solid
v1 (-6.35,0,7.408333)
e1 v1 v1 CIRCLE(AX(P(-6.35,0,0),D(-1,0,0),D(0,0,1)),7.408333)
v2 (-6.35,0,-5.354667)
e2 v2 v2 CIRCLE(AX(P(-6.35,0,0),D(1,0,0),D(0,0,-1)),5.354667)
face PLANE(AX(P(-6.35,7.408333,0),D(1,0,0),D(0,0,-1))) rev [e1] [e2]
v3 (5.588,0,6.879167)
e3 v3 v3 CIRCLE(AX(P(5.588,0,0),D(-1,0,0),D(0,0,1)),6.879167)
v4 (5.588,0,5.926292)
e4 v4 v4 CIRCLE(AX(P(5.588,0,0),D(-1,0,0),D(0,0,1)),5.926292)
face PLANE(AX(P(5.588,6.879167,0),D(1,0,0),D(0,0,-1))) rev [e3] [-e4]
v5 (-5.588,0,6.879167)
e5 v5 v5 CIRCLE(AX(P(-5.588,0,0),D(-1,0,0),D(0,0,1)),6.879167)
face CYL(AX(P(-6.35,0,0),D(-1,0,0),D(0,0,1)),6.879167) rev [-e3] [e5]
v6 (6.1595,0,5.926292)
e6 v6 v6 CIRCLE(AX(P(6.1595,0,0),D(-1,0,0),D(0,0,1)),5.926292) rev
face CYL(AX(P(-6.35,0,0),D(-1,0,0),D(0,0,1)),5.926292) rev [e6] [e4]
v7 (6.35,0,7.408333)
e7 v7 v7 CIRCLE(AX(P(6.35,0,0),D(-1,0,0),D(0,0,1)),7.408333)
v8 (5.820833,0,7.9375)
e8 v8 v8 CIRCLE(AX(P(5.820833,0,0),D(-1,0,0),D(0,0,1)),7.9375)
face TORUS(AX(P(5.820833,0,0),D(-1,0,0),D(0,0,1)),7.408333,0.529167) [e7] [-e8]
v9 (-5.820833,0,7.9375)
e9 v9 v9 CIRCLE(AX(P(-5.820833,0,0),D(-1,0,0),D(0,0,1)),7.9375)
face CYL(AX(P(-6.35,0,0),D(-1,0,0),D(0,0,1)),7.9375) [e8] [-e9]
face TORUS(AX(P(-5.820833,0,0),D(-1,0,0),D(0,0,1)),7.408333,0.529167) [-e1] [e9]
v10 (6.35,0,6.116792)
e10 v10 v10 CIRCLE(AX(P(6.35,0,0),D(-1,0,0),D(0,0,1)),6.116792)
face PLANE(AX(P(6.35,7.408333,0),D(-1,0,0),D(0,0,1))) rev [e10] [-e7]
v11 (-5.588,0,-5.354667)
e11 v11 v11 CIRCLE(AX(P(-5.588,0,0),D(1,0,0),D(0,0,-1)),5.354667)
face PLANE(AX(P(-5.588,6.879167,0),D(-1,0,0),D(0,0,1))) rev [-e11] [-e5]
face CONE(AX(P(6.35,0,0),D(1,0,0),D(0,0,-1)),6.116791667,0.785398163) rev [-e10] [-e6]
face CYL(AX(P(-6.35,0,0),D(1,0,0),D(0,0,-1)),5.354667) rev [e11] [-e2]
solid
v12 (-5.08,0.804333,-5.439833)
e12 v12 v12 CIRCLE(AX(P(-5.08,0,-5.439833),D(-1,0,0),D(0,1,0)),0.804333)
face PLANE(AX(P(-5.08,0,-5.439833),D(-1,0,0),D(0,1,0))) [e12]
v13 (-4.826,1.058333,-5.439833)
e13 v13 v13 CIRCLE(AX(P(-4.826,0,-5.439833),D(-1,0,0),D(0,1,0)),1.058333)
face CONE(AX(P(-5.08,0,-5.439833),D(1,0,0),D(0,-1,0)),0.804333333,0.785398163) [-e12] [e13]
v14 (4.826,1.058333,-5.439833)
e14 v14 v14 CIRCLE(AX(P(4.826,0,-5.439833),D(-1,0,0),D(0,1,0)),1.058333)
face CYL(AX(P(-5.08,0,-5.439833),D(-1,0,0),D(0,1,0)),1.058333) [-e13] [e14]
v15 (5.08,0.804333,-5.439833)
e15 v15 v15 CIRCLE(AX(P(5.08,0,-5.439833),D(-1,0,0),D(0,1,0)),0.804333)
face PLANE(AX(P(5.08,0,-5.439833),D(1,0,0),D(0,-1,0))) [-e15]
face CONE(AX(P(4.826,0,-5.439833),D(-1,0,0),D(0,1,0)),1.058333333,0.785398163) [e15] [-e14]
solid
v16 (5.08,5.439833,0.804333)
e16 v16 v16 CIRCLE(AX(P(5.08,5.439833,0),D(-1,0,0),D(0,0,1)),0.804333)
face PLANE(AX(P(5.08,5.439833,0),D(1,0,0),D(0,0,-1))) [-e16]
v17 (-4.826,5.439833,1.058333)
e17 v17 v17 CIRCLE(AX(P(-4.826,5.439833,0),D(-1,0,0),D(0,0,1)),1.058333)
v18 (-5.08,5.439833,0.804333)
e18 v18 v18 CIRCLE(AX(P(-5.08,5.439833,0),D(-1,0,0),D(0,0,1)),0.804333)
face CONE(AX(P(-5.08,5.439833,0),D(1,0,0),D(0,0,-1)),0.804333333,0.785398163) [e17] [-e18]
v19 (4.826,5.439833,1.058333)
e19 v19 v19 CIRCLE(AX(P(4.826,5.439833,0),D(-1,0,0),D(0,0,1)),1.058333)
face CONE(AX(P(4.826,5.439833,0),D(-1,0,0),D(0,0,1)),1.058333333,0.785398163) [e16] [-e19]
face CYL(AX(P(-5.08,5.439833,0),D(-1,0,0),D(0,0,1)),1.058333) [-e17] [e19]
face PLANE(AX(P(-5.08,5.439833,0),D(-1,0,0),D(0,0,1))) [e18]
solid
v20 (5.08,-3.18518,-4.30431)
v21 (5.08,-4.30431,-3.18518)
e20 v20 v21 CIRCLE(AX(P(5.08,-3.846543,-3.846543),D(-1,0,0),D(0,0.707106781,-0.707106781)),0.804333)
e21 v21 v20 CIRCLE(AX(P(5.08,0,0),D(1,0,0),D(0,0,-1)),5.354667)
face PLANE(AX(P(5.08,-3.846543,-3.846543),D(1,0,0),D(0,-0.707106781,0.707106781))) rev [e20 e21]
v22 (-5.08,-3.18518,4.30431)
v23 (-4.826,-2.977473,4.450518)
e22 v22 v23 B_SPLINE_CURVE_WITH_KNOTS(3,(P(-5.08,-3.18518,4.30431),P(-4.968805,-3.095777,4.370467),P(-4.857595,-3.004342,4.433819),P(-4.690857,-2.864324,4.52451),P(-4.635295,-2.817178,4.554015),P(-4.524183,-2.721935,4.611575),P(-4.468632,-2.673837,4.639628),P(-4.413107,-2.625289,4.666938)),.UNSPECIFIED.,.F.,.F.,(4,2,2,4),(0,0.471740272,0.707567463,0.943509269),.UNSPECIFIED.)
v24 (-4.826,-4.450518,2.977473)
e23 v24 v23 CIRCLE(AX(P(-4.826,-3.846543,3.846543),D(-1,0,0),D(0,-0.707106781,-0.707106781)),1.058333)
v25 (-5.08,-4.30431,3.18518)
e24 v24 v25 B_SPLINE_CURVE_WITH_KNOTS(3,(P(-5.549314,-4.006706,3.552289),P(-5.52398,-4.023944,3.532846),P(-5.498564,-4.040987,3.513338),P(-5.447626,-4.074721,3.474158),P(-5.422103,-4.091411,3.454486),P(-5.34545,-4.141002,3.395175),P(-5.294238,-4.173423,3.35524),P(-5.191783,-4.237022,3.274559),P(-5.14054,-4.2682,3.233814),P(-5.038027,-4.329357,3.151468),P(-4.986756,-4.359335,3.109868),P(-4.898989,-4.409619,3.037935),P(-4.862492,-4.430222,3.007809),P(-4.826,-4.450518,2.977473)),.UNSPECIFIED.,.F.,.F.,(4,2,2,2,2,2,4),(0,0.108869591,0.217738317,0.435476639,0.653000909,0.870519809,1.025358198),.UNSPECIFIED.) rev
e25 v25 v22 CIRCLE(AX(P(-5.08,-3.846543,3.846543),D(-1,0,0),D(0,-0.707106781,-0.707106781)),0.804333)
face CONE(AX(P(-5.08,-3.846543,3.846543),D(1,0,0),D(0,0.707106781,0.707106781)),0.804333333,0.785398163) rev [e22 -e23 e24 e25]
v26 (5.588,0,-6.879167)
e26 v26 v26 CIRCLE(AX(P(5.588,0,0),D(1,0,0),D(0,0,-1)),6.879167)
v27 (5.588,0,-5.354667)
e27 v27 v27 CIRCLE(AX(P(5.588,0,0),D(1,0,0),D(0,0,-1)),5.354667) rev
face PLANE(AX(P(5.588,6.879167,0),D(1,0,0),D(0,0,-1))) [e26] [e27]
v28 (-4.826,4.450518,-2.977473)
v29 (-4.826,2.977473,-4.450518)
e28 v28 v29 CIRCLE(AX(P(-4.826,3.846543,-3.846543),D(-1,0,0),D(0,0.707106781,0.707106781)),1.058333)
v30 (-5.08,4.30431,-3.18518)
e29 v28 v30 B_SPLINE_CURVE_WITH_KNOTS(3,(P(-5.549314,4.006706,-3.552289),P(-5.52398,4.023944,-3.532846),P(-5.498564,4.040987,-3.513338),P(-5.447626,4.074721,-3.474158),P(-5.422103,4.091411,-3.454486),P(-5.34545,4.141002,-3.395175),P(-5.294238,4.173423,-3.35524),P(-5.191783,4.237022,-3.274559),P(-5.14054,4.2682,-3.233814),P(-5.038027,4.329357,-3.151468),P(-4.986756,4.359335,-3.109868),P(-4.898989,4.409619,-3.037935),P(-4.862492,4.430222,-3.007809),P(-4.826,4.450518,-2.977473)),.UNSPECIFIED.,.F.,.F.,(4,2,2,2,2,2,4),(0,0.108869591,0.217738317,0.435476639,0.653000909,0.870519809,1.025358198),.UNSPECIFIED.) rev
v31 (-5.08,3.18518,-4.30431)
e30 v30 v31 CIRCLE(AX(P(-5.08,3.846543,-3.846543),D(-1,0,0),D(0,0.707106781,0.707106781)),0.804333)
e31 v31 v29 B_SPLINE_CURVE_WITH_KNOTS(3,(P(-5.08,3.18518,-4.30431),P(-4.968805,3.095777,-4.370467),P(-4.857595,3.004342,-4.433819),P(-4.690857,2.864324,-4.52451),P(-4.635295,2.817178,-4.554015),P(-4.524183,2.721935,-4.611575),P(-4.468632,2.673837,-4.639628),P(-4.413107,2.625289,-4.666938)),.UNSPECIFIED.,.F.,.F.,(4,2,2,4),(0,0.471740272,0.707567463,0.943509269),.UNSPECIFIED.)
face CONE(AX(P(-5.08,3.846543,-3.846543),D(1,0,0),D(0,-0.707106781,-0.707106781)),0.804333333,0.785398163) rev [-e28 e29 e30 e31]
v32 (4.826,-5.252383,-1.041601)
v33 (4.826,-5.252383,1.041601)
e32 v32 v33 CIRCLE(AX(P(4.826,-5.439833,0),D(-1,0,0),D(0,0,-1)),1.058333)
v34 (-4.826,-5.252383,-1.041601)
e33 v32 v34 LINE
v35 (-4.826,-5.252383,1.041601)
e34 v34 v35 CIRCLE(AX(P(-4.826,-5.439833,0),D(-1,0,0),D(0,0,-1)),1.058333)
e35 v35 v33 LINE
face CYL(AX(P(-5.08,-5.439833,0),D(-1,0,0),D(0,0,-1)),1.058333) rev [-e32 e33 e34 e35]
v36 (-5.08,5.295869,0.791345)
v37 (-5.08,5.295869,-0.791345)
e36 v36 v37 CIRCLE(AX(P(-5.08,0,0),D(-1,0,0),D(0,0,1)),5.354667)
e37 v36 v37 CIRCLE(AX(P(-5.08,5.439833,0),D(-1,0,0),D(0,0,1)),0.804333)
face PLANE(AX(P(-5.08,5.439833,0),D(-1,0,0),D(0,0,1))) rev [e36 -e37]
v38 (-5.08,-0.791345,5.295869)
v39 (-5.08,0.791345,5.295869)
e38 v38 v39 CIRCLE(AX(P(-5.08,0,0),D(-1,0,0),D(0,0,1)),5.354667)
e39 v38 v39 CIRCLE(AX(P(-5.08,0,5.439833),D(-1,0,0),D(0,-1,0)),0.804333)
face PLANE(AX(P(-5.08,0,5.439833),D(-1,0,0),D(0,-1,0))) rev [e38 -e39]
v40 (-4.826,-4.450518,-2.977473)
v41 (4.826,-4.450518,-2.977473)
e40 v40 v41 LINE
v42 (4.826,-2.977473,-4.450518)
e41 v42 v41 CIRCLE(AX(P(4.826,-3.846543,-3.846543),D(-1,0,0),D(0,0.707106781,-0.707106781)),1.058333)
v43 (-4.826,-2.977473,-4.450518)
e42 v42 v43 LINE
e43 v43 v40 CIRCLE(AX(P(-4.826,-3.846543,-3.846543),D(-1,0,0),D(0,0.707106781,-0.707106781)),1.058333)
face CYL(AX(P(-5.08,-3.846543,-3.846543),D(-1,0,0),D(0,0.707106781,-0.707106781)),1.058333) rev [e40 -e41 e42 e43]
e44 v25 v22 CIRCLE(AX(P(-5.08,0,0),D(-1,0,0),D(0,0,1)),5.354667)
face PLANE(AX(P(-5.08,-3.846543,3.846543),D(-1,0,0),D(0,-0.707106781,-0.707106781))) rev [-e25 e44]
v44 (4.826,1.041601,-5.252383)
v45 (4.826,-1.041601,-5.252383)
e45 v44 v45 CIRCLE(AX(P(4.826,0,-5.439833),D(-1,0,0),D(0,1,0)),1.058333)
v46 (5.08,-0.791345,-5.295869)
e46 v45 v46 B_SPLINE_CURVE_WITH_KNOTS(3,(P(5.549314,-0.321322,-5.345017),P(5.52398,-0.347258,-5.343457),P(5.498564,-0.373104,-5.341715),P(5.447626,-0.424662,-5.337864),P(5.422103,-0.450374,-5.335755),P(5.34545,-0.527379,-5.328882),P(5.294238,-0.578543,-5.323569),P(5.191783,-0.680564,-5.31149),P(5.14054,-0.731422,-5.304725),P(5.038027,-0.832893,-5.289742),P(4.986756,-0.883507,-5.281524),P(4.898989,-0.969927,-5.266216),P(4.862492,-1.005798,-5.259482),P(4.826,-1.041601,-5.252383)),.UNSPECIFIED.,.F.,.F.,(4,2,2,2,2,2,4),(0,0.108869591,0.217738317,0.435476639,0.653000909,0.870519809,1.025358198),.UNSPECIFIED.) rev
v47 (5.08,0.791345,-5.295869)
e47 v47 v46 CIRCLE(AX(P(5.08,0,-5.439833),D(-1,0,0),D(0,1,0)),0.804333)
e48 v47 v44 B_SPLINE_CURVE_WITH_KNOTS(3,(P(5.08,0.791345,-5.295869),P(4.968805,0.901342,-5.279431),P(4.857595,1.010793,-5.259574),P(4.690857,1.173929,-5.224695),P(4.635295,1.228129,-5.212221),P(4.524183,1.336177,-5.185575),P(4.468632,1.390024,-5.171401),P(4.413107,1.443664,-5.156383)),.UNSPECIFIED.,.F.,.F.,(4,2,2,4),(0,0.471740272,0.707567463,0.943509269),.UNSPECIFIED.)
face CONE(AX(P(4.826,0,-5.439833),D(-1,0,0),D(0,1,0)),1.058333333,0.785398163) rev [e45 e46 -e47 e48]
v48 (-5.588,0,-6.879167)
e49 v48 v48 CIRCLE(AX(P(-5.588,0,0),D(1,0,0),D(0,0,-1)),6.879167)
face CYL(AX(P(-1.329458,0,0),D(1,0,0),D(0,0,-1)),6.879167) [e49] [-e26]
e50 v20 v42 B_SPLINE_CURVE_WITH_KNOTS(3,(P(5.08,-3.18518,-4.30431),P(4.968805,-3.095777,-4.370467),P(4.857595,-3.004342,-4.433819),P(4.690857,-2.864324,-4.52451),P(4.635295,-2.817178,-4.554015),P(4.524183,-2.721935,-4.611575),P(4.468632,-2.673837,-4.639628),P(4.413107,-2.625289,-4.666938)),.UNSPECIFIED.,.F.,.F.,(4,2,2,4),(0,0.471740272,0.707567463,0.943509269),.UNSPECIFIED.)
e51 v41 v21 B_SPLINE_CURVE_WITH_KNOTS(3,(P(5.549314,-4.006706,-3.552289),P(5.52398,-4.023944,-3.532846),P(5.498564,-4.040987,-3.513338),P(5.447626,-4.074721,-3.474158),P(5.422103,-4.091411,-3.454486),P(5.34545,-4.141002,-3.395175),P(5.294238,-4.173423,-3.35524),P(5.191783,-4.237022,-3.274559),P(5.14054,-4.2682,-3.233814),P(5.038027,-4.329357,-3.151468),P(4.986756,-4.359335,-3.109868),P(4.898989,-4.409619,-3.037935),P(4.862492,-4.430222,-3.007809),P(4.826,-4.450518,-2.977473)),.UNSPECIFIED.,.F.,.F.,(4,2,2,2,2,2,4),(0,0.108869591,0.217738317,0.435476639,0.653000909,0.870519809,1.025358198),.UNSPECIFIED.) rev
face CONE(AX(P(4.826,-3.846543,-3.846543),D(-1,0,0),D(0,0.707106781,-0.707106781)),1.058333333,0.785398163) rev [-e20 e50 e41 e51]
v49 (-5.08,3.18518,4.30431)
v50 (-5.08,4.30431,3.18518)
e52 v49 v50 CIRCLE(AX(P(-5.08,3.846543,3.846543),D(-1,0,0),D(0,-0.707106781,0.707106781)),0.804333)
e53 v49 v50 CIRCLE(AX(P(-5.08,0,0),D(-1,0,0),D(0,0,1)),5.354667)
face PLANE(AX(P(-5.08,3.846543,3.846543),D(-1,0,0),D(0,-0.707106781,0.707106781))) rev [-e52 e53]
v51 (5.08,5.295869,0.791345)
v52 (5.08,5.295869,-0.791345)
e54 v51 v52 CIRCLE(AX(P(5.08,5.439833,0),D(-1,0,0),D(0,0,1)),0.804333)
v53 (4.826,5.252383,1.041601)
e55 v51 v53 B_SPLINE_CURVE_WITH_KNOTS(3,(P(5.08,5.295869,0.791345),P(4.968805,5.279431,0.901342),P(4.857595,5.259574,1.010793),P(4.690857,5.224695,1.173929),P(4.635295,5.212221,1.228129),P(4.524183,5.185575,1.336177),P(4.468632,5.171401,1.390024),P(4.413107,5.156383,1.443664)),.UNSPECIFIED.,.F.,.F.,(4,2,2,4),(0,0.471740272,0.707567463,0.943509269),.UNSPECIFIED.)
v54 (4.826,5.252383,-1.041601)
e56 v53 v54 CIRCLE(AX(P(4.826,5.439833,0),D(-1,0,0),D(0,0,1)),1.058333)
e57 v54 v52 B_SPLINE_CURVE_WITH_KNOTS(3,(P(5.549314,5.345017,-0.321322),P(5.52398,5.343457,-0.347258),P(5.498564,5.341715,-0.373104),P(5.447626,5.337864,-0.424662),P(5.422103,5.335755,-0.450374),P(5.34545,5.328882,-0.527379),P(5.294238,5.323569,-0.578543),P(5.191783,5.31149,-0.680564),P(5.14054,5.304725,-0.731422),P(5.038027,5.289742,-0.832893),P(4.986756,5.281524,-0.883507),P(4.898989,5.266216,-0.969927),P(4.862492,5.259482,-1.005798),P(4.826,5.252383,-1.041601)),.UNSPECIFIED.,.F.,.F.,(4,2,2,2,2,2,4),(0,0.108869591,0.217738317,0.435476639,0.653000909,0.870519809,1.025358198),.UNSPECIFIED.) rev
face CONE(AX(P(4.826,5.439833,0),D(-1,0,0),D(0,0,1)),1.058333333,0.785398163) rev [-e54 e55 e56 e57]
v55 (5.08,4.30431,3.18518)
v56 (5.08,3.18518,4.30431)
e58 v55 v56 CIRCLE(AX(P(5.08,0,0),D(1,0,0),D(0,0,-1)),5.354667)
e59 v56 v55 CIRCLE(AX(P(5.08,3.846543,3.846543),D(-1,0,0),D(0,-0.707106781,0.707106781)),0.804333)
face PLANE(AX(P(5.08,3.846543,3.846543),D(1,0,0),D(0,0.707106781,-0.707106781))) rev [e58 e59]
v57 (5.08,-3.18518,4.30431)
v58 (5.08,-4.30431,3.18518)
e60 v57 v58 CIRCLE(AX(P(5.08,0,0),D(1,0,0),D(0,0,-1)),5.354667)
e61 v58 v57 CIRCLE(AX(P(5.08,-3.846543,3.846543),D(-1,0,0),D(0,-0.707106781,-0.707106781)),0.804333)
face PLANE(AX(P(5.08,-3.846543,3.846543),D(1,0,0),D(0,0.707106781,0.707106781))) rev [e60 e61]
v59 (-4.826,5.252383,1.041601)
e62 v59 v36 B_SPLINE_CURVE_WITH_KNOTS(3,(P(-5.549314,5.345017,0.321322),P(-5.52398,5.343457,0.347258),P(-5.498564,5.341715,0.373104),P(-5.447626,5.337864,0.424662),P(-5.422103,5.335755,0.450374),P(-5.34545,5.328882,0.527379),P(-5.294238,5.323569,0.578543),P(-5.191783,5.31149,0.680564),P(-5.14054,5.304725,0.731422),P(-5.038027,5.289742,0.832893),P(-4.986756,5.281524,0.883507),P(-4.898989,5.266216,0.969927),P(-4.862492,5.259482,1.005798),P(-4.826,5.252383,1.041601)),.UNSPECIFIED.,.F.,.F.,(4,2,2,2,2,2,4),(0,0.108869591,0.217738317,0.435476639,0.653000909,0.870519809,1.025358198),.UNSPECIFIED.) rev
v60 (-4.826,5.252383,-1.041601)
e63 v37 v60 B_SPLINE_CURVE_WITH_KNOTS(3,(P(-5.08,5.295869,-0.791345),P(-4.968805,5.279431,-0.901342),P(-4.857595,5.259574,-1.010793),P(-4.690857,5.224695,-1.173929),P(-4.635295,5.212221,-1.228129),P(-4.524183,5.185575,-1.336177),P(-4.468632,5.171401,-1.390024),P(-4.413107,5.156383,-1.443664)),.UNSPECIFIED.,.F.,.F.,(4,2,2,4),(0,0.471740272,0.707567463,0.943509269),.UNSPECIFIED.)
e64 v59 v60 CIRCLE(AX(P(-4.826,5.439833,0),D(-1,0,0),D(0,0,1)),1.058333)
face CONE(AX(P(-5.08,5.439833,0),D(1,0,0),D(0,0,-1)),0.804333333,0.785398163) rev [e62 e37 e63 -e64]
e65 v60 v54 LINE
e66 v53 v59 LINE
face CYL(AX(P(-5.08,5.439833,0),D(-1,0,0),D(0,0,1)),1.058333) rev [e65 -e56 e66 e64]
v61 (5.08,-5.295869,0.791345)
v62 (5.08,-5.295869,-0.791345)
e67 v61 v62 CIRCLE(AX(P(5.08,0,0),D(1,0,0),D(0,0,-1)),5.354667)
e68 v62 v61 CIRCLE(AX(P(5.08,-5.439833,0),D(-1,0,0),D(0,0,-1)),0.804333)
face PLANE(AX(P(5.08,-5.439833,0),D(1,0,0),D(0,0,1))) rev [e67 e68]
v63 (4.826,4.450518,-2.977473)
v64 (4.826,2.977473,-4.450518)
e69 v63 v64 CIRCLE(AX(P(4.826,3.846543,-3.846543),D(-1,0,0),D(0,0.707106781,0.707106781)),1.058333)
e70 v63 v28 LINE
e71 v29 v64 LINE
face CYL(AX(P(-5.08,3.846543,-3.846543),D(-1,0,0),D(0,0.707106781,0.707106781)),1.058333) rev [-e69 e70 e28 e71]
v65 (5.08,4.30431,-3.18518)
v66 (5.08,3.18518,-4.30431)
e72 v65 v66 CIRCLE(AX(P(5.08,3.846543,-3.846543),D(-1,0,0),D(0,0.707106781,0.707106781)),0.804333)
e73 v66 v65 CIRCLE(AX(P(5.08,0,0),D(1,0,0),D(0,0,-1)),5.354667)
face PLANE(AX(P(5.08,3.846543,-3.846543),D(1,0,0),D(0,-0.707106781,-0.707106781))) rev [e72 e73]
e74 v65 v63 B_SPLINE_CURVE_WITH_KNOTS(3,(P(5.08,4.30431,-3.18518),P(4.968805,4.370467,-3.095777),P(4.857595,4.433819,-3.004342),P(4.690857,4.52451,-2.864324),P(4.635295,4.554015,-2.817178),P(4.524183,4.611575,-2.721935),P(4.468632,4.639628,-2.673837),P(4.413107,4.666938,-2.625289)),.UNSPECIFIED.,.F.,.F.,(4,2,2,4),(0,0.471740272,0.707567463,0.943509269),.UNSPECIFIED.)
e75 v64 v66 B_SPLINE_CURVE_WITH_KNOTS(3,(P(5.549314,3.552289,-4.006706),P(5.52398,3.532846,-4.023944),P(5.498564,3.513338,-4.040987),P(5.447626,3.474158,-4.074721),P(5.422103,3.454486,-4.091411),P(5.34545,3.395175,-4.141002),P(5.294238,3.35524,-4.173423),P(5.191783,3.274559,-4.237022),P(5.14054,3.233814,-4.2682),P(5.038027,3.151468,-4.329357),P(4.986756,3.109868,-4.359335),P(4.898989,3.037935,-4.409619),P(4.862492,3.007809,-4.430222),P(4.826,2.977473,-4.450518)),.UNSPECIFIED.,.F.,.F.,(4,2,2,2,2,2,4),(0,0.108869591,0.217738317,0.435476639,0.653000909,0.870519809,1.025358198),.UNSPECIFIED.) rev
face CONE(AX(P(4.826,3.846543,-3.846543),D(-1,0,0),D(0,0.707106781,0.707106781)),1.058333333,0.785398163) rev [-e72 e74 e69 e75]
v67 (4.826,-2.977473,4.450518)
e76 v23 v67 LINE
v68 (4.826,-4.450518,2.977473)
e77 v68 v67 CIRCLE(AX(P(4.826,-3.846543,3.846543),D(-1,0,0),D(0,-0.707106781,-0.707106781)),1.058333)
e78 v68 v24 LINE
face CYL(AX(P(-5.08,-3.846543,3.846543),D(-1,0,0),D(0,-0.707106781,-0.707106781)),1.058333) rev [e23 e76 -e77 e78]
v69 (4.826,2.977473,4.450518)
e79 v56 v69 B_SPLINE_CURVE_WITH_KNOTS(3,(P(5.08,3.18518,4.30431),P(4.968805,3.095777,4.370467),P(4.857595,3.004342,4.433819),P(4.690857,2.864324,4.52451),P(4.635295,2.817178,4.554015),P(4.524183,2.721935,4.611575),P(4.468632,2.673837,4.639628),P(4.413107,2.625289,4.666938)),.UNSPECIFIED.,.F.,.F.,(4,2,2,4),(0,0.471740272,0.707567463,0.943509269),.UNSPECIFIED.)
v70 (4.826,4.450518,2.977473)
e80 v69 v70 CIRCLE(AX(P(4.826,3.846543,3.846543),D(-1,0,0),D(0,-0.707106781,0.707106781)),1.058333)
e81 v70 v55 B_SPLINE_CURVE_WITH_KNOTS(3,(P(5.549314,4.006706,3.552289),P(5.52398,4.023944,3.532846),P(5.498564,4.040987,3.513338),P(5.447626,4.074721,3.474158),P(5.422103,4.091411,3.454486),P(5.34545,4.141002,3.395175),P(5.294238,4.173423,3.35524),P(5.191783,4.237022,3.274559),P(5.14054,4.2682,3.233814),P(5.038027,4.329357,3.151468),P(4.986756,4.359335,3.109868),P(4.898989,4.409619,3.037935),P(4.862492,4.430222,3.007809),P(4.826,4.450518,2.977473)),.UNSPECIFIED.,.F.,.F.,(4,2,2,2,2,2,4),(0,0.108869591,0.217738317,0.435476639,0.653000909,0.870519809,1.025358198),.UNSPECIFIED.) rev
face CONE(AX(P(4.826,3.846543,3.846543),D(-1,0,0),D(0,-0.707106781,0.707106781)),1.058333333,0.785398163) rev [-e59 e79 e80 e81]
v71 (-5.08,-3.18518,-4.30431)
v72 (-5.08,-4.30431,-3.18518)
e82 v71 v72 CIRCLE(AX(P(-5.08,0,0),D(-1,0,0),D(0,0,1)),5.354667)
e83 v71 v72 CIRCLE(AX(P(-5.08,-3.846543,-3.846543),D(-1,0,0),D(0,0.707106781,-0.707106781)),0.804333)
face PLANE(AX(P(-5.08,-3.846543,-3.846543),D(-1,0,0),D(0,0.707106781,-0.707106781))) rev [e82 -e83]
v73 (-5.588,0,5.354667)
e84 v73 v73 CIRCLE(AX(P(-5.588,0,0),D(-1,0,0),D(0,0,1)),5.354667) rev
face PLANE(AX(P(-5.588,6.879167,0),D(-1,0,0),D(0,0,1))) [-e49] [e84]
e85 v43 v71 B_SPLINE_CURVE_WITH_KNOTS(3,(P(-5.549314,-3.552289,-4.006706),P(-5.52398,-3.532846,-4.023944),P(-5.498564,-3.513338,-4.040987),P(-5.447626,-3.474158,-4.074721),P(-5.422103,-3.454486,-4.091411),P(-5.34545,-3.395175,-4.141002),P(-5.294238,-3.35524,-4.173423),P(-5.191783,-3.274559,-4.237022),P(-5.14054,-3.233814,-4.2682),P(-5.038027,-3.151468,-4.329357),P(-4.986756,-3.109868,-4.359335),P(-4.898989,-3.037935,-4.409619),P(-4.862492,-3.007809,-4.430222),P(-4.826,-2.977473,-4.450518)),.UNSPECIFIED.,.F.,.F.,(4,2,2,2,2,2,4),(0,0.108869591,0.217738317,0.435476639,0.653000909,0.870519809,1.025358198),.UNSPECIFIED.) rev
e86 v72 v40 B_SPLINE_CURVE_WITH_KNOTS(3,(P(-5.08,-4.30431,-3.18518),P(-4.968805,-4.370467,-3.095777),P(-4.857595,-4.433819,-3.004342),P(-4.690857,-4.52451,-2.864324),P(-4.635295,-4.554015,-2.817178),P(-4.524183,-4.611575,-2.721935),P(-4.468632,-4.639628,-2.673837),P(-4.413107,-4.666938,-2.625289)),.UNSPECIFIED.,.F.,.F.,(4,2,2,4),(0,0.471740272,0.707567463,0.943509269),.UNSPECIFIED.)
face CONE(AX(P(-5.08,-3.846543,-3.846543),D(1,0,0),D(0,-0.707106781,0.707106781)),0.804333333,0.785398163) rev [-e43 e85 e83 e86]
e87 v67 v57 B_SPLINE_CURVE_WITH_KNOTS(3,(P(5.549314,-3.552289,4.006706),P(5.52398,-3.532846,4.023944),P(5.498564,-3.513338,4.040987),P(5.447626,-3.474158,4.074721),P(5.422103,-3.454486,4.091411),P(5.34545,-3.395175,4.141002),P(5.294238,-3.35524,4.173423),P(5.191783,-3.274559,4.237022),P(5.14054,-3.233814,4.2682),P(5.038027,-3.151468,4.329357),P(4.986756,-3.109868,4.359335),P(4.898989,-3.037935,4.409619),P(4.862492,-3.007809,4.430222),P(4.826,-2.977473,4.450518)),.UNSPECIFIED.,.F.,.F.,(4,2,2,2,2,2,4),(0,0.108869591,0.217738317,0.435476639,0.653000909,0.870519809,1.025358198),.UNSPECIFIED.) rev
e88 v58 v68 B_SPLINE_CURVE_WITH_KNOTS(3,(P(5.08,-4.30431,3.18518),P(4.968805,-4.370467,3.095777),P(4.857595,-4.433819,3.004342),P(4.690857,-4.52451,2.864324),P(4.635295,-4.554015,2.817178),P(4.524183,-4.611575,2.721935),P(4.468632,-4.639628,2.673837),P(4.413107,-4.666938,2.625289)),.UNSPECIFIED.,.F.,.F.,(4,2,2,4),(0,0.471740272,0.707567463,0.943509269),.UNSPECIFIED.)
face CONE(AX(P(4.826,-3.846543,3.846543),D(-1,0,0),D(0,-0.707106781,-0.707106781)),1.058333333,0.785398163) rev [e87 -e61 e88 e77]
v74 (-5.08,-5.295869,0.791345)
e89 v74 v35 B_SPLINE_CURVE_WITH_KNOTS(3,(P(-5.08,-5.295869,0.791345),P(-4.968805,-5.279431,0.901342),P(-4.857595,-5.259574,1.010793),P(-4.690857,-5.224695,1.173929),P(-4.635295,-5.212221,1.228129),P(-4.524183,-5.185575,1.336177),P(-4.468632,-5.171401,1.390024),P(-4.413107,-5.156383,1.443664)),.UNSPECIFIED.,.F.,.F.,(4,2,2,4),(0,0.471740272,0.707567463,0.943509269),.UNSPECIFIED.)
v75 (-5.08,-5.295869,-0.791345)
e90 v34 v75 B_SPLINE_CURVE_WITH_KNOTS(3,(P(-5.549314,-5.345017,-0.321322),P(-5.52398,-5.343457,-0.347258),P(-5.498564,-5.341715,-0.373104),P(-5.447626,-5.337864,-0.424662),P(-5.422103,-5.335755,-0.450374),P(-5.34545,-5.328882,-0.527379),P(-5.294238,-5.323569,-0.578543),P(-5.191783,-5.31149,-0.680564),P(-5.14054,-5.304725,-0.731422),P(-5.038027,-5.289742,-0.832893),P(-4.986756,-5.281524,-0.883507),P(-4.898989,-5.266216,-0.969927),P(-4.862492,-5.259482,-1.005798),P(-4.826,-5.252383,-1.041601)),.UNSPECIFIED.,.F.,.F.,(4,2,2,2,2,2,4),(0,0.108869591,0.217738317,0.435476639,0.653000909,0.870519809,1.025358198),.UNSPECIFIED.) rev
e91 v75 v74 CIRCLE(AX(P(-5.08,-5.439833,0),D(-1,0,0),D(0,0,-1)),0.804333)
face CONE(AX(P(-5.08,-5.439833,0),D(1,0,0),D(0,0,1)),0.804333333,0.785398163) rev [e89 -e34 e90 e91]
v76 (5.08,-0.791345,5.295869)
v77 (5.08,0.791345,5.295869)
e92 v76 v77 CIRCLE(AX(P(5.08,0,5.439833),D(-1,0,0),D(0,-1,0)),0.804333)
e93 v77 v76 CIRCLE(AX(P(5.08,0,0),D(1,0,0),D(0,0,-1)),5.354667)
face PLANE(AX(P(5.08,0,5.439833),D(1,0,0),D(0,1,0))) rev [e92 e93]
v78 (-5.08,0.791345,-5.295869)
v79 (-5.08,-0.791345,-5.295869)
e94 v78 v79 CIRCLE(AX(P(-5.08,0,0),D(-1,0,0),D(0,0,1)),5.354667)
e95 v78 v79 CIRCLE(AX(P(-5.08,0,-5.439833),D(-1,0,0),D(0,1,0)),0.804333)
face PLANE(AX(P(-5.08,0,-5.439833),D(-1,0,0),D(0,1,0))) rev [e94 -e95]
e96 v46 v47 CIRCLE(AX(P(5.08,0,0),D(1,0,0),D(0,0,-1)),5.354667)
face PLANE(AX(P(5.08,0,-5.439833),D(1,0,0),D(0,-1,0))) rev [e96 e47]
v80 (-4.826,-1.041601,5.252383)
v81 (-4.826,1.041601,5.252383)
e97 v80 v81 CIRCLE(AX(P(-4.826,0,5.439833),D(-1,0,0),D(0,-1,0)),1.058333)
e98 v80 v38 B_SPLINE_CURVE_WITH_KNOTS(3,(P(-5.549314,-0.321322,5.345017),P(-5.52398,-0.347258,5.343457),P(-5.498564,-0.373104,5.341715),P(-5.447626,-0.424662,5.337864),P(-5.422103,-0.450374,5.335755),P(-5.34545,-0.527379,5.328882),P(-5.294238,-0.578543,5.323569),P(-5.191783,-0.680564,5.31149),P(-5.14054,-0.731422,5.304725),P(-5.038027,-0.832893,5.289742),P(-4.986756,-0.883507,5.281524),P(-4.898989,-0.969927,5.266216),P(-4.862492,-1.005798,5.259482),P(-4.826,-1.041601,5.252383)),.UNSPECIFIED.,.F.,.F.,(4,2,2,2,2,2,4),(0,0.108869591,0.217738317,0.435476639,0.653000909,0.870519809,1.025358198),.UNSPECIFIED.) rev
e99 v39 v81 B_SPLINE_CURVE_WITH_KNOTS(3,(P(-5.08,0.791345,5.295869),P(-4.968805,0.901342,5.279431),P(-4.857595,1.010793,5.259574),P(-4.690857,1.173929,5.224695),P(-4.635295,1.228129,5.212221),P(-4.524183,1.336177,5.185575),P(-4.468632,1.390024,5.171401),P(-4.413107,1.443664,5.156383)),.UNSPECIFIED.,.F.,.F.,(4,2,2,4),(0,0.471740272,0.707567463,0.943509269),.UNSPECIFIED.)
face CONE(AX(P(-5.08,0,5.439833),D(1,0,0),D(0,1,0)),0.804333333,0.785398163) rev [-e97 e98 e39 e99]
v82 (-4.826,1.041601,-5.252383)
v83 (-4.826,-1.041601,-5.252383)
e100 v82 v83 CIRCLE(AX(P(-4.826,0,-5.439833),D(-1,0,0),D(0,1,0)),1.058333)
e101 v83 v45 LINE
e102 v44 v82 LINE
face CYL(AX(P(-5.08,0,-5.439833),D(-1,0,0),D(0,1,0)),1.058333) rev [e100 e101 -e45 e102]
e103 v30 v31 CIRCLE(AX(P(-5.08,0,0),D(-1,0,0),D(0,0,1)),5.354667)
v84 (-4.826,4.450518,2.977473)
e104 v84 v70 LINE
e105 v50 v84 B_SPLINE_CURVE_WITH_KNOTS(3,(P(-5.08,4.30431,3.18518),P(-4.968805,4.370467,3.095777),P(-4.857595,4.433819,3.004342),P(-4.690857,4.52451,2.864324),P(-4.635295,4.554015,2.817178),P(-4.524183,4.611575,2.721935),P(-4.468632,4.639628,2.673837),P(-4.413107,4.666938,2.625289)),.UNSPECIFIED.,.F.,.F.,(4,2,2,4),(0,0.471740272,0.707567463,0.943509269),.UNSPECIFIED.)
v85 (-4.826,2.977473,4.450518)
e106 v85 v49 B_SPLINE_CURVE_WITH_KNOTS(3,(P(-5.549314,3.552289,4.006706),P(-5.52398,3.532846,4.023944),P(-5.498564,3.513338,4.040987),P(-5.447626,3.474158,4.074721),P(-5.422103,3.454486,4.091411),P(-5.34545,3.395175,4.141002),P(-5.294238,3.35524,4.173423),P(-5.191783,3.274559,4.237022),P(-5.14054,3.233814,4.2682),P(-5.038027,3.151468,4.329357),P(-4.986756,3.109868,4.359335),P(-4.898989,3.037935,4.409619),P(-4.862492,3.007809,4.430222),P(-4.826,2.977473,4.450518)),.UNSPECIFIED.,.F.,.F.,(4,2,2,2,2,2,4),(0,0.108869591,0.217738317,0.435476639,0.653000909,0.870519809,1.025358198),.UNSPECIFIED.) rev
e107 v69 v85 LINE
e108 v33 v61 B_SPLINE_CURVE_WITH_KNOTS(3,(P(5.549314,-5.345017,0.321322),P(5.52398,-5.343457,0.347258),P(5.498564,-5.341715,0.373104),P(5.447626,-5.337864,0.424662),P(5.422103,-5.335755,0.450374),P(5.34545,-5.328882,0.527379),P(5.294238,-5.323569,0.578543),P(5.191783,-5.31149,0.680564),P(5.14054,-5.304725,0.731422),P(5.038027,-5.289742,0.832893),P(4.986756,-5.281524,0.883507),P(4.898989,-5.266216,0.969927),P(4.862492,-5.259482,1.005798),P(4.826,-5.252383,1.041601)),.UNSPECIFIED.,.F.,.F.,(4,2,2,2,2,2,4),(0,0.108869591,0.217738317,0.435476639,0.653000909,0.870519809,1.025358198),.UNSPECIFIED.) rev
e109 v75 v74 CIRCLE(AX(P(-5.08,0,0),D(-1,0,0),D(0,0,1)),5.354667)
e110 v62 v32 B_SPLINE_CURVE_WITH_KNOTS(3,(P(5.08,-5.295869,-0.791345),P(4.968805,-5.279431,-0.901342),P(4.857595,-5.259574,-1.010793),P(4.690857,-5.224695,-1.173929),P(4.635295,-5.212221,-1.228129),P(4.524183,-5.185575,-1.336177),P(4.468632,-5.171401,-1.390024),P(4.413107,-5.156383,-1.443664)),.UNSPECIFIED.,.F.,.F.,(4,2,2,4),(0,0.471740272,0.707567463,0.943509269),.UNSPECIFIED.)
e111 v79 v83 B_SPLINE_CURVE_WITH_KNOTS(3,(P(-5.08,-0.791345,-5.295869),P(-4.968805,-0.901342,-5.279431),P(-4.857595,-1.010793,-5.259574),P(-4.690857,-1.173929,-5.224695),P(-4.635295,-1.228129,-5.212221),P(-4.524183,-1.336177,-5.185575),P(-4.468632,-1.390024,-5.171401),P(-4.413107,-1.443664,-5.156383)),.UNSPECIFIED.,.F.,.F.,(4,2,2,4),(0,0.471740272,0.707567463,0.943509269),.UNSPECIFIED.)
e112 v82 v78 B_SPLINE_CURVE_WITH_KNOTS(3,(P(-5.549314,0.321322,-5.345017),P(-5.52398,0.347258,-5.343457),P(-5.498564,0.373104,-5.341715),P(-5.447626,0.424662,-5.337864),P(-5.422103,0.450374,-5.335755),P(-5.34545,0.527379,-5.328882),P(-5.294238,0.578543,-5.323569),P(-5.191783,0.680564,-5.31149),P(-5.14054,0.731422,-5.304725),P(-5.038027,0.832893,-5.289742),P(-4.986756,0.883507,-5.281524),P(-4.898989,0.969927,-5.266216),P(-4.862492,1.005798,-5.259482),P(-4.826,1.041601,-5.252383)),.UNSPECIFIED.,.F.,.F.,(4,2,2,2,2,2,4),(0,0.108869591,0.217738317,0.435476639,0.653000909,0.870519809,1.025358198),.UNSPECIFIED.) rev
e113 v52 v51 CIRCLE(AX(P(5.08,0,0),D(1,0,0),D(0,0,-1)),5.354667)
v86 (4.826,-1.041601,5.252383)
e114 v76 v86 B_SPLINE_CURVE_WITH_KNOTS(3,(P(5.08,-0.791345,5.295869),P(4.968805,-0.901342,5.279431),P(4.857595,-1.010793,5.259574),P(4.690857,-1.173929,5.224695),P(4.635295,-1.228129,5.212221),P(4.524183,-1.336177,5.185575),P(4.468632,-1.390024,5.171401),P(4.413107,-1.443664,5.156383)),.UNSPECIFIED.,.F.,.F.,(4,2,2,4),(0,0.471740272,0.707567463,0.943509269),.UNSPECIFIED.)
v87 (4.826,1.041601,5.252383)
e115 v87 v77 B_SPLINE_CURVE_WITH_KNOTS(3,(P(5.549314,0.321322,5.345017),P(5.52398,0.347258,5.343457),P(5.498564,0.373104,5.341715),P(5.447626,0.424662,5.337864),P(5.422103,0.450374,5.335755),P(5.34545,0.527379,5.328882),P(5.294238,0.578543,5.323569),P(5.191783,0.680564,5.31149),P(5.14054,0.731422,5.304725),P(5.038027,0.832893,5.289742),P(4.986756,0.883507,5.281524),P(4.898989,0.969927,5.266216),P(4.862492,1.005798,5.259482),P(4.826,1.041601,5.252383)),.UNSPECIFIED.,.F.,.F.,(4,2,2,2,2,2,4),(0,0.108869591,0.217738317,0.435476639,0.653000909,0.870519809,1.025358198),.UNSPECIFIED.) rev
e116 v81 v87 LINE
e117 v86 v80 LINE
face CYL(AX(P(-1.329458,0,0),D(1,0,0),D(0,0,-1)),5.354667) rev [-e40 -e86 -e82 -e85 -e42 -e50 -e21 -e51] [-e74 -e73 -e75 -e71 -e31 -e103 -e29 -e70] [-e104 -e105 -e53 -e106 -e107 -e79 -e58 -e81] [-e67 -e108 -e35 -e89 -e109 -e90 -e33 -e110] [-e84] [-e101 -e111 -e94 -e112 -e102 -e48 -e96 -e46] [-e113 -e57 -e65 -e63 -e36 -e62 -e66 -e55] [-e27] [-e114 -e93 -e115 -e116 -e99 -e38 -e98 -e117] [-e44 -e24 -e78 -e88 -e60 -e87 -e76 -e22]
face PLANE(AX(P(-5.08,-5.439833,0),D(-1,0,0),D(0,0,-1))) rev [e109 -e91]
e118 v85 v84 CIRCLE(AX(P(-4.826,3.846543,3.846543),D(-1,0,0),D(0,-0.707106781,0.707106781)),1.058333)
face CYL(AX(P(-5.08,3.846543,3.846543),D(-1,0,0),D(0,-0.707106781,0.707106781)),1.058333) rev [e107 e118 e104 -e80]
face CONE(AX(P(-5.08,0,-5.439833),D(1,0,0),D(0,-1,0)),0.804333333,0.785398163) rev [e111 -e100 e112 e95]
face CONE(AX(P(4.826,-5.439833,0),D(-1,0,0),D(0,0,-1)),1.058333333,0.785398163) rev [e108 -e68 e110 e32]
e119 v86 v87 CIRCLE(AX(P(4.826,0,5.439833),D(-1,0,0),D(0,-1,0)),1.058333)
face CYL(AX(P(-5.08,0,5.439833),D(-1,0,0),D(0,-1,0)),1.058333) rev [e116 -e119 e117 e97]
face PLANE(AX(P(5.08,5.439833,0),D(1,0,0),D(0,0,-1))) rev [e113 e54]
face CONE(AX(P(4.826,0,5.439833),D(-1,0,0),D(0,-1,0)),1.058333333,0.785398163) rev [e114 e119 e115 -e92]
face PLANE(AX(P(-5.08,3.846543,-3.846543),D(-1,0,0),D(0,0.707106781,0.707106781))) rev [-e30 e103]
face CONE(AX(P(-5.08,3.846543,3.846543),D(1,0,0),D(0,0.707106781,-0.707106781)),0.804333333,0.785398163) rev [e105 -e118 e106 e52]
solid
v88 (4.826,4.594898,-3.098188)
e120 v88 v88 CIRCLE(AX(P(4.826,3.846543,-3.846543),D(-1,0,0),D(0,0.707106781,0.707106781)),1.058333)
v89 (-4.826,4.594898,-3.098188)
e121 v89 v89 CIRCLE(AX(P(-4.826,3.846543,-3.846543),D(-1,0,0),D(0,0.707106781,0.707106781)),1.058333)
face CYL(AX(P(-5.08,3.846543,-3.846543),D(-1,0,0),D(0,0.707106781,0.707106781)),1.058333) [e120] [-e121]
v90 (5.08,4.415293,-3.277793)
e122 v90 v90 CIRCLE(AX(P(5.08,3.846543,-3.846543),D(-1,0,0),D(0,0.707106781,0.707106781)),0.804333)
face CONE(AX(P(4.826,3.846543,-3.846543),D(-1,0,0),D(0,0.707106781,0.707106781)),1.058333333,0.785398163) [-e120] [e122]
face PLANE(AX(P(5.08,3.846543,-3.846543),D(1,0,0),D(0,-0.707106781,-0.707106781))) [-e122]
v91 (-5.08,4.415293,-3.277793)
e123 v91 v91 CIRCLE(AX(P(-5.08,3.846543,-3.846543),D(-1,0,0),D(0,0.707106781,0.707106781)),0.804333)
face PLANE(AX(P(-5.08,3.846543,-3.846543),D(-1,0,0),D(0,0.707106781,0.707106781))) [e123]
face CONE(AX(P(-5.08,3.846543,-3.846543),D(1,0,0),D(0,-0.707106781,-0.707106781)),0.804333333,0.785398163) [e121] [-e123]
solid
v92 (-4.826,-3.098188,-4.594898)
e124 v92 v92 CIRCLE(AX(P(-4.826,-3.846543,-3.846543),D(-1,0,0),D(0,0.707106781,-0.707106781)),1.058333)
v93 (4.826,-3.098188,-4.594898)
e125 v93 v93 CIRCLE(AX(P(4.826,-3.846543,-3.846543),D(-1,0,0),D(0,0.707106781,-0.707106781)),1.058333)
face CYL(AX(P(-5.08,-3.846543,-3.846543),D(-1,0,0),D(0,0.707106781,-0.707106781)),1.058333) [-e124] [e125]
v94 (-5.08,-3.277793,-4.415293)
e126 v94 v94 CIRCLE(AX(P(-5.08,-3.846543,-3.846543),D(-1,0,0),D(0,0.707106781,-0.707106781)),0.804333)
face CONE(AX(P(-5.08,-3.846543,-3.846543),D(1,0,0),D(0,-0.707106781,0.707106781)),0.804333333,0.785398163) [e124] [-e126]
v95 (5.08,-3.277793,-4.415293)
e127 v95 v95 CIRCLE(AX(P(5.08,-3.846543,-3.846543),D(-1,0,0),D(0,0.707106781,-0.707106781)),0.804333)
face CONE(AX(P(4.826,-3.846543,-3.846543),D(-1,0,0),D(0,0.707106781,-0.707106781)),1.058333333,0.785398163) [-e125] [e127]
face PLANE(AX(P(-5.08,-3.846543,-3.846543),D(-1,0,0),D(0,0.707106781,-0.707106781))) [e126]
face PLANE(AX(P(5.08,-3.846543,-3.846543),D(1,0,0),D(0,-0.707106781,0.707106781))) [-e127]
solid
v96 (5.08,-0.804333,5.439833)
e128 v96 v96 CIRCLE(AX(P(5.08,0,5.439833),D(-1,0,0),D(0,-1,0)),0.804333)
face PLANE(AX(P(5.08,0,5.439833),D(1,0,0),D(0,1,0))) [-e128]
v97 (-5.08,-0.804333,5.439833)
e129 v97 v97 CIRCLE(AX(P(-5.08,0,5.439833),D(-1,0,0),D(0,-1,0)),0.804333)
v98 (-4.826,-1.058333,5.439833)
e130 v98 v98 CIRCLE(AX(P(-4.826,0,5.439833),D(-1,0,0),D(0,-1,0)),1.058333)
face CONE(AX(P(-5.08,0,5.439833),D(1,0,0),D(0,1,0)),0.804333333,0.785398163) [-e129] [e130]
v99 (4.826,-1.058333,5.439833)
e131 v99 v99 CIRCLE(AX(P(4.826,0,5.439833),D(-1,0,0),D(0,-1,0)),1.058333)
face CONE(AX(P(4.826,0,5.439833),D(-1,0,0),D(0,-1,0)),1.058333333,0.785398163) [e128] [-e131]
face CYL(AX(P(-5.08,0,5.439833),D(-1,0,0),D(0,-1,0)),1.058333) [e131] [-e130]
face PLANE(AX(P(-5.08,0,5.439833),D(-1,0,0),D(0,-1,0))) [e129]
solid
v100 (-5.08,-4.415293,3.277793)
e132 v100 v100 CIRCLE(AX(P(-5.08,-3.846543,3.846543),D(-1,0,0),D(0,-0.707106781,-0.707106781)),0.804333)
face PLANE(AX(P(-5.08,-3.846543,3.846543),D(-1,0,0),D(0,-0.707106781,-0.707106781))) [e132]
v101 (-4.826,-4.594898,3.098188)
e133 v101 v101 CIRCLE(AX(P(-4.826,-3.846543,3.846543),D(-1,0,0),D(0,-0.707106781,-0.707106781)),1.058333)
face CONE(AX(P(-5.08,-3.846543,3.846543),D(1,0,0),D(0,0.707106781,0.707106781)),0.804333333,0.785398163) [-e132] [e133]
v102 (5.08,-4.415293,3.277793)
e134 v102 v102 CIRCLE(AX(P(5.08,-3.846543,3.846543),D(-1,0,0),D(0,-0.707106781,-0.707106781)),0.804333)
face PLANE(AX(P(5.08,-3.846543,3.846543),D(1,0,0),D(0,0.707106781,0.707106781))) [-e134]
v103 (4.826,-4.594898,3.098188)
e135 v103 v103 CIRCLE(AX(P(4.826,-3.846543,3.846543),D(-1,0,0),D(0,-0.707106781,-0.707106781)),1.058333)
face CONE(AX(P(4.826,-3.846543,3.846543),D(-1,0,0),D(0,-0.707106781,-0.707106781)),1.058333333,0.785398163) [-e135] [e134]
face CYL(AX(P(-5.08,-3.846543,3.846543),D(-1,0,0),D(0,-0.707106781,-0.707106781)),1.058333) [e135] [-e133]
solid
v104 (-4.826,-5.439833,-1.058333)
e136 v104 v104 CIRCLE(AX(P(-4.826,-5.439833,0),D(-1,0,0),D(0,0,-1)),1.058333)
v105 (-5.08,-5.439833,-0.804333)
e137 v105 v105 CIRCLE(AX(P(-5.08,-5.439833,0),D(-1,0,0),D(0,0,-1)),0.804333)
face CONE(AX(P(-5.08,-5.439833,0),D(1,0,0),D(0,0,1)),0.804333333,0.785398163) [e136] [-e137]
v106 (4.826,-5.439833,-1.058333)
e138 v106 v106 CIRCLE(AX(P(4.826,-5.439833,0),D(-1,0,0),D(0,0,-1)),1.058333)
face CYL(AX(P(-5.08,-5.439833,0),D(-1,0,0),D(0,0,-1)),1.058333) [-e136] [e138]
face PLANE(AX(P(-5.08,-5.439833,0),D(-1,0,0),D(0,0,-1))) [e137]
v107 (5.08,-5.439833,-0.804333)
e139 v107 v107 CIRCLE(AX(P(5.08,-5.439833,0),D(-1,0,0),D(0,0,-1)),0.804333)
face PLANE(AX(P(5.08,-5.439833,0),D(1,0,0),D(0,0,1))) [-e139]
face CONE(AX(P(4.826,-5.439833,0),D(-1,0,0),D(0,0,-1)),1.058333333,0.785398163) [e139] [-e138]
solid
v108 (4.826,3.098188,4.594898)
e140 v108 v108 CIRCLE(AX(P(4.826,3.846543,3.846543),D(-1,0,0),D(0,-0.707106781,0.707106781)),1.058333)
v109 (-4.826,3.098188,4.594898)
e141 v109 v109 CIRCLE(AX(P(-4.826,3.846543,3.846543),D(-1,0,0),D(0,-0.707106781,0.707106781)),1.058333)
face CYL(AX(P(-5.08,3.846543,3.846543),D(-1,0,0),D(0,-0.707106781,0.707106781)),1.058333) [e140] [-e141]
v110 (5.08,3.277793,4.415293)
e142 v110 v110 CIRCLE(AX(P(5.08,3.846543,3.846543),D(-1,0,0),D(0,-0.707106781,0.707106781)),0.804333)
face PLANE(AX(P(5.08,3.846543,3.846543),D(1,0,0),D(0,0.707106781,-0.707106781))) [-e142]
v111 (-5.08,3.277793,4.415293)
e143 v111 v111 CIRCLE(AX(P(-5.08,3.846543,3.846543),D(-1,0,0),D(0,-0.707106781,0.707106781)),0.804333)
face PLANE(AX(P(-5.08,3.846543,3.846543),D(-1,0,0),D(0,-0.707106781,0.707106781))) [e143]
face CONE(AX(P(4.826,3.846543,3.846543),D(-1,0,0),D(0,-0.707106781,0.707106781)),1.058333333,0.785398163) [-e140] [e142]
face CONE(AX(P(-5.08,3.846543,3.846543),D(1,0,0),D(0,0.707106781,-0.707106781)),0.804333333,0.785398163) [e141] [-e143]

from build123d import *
from build123d.topology import SkipClean

# Parameters (mm, degrees)
CIRPATTERN2_COUNT  = 8
CIRPATTERN4_COUNT  = 8
SKETCH7_W          = 0.762
SKETCH7_H          = 1.163791667
CHAMFER1_SIZE      = 0.1905
SKETCH8_R          = 5.354666667
CUT_EXTRUDE2_DEPTH = 17.386691541


# Read off the part's stored shape, not the designer's step: DeleteFace2
with BuildPart() as part:
    # Sketch1 → Revolve1 (revolve)
    with BuildSketch(Plane.XY, mode=Mode.PRIVATE) as revolve1_sk:
        with BuildLine():
            Line((-6.35, 7.408333333), (-6.35, 4.7625))
            Line((-6.35, 4.7625), (-5.588, 4.7625))
            Line((-5.588, 4.7625), (-5.588, 6.879166667))
            Line((-5.588, 6.879166667), (-2.294466667, 6.879166667))
            Line((-2.294466667, 6.879166667), (-1.646766667, 6.879166667))
            Line((-1.646766667, 6.879166667), (1.646766667, 6.879166667))
            Line((1.646766667, 6.879166667), (2.294466667, 6.879166667))
            Line((2.294466667, 6.879166667), (5.588, 6.879166667))
            Line((5.588, 6.879166667), (5.588, 4.7625))
            Line((5.588, 4.7625), (6.35, 4.7625))
            Line((6.35, 4.7625), (6.35, 7.408333333))
            ThreePointArc((6.35, 7.408333333), (6.195010672, 7.782510672), (5.820833333, 7.9375))
            Line((5.820833333, 7.9375), (-5.820833333, 7.9375))
            ThreePointArc((-5.820833333, 7.9375), (-6.195010672, 7.782510672), (-6.35, 7.408333333))
        make_face()
    revolve(revolve1_sk.sketch.rotate(Axis((-6.35, 0, 0), (1, 0, 0)), 90), axis=Axis((-6.35, 0, 0), (1, 0, 0)))

    # Sketch7 → Cut-Revolve5 (revolve, cut)
    with BuildSketch(Plane.XY, mode=Mode.PRIVATE) as cut_revolve5_sk:
        with Locations((5.969, 5.344395834)):
            Rectangle(SKETCH7_W, SKETCH7_H)
    revolve(cut_revolve5_sk.sketch.rotate(Axis((-6.35, 0, 0), (1, 0, 0)), 90), axis=Axis((-6.35, 0, 0), (1, 0, 0)), mode=Mode.SUBTRACT)

    # Chamfer1
    chamfer1_edges = [part.edges().sort_by_distance(p)[0] for p in [
        (6.35, 0, -5.926291667),
    ]]
    chamfer(chamfer1_edges, length=CHAMFER1_SIZE)

    # Sketch8 → Cut-Extrude2 (cut, through all)
    with BuildSketch(Plane(origin=(-5.588, 0, 0), x_dir=(0, 0, -1), z_dir=(1, 0, 0))):
        Circle(SKETCH8_R)
    extrude(amount=-CUT_EXTRUDE2_DEPTH, mode=Mode.SUBTRACT)


with BuildPart() as body_2:
    # Sketch3 → Revolve3 (revolve)
    with BuildSketch(Plane.XY, mode=Mode.PRIVATE) as revolve3_sk:
        Polygon((-5.08, 5.439833333), (-5.08, 4.6355), (-4.826, 4.3815), (4.826, 4.3815), (5.08, 4.6355), (5.08, 5.439833333), align=None)
    revolve(revolve3_sk.sketch.rotate(Axis((-5.08, 5.439833333, 0), (1, 0, 0)), 270), axis=Axis((-5.08, 5.439833333, 0), (1, 0, 0)))


with BuildPart() as cirpattern2_1:
    # CirPattern2: pattern copy
    add(body_2.part.rotate(Axis((0, 0, 0), (1, 0, 0)), 1 * 360 / CIRPATTERN2_COUNT))


with BuildPart() as cirpattern2_2:
    # CirPattern2: pattern copy
    add(body_2.part.rotate(Axis((0, 0, 0), (1, 0, 0)), 2 * 360 / CIRPATTERN2_COUNT))


with BuildPart() as cirpattern2_3:
    # CirPattern2: pattern copy
    add(body_2.part.rotate(Axis((0, 0, 0), (1, 0, 0)), 3 * 360 / CIRPATTERN2_COUNT))


with BuildPart() as cirpattern2_4:
    # CirPattern2: pattern copy
    add(body_2.part.rotate(Axis((0, 0, 0), (1, 0, 0)), 4 * 360 / CIRPATTERN2_COUNT))


with BuildPart() as cirpattern2_5:
    # CirPattern2: pattern copy
    add(body_2.part.rotate(Axis((0, 0, 0), (1, 0, 0)), 5 * 360 / CIRPATTERN2_COUNT))


with BuildPart() as cirpattern2_6:
    # CirPattern2: pattern copy
    add(body_2.part.rotate(Axis((0, 0, 0), (1, 0, 0)), 6 * 360 / CIRPATTERN2_COUNT))


with BuildPart() as cirpattern2_7:
    # CirPattern2: pattern copy
    add(body_2.part.rotate(Axis((0, 0, 0), (1, 0, 0)), 7 * 360 / CIRPATTERN2_COUNT))


with BuildPart() as body_10:
    # Sketch5 → Revolve4 (revolve)
    with BuildSketch(Plane.XY, mode=Mode.PRIVATE) as revolve4_sk:
        Polygon((-5.588, 6.879166667), (-2.294466667, 6.879166667), (-1.646766667, 6.879166667), (1.646766667, 6.879166667), (2.294466667, 6.879166667), (5.588, 6.879166667), (5.588, 5.608666667), (5.334, 5.354666667), (0, 5.354666667), (-5.334, 5.354666667), (-5.588, 5.608666667), align=None)
    revolve(revolve4_sk.sketch.rotate(Axis((5.334, 0, 0), (1, 0, 0)), 270), axis=Axis((5.334, 0, 0), (1, 0, 0)))

    # Sketch3<3> → Cut-Revolve3 (revolve, cut)
    with BuildSketch(Plane.XY):
        Polygon((-5.08, 5.439833333), (-5.08, 4.6355), (-4.826, 4.3815), (4.826, 4.3815), (5.08, 4.6355), (5.08, 5.439833333), align=None)
    cut_revolve3 = revolve(axis=Axis((-5.08, 5.439833333, 0), (1, 0, 0)), mode=Mode.SUBTRACT)

    # CirPattern4: Cut-Revolve3 ×8 about axis
    cirpattern4_axis = Axis((0, 0, 0), (1, 0, 0))
    for i in range(1, CIRPATTERN4_COUNT):
        add(cut_revolve3.rotate(cirpattern4_axis, i * 360 / CIRPATTERN4_COUNT), mode=Mode.SUBTRACT)

    # DeleteFace2 outline → DeleteFace2 (revolve)
    with SkipClean():  # the faces are left unmerged after this step: merging them gives an invalid solid
        with BuildSketch(Plane.YX):
            Polygon((5.354666667, 5.588), (5.354666667, 5.334), (5.608666667, 5.588), align=None)
            Polygon((5.608666667, -5.588), (5.354666667, -5.334), (5.354666667, -5.588), align=None)
        revolve(axis=Axis((0, 0, 0), (1, 0, 0)))
    add(body_10.part.scale(1), mode=Mode.REPLACE)  # the faces are merged on a copy


solid = Compound([part.part, body_2.part, cirpattern2_1.part, cirpattern2_2.part, cirpattern2_3.part, cirpattern2_4.part, cirpattern2_5.part, cirpattern2_6.part, cirpattern2_7.part, body_10.part])
